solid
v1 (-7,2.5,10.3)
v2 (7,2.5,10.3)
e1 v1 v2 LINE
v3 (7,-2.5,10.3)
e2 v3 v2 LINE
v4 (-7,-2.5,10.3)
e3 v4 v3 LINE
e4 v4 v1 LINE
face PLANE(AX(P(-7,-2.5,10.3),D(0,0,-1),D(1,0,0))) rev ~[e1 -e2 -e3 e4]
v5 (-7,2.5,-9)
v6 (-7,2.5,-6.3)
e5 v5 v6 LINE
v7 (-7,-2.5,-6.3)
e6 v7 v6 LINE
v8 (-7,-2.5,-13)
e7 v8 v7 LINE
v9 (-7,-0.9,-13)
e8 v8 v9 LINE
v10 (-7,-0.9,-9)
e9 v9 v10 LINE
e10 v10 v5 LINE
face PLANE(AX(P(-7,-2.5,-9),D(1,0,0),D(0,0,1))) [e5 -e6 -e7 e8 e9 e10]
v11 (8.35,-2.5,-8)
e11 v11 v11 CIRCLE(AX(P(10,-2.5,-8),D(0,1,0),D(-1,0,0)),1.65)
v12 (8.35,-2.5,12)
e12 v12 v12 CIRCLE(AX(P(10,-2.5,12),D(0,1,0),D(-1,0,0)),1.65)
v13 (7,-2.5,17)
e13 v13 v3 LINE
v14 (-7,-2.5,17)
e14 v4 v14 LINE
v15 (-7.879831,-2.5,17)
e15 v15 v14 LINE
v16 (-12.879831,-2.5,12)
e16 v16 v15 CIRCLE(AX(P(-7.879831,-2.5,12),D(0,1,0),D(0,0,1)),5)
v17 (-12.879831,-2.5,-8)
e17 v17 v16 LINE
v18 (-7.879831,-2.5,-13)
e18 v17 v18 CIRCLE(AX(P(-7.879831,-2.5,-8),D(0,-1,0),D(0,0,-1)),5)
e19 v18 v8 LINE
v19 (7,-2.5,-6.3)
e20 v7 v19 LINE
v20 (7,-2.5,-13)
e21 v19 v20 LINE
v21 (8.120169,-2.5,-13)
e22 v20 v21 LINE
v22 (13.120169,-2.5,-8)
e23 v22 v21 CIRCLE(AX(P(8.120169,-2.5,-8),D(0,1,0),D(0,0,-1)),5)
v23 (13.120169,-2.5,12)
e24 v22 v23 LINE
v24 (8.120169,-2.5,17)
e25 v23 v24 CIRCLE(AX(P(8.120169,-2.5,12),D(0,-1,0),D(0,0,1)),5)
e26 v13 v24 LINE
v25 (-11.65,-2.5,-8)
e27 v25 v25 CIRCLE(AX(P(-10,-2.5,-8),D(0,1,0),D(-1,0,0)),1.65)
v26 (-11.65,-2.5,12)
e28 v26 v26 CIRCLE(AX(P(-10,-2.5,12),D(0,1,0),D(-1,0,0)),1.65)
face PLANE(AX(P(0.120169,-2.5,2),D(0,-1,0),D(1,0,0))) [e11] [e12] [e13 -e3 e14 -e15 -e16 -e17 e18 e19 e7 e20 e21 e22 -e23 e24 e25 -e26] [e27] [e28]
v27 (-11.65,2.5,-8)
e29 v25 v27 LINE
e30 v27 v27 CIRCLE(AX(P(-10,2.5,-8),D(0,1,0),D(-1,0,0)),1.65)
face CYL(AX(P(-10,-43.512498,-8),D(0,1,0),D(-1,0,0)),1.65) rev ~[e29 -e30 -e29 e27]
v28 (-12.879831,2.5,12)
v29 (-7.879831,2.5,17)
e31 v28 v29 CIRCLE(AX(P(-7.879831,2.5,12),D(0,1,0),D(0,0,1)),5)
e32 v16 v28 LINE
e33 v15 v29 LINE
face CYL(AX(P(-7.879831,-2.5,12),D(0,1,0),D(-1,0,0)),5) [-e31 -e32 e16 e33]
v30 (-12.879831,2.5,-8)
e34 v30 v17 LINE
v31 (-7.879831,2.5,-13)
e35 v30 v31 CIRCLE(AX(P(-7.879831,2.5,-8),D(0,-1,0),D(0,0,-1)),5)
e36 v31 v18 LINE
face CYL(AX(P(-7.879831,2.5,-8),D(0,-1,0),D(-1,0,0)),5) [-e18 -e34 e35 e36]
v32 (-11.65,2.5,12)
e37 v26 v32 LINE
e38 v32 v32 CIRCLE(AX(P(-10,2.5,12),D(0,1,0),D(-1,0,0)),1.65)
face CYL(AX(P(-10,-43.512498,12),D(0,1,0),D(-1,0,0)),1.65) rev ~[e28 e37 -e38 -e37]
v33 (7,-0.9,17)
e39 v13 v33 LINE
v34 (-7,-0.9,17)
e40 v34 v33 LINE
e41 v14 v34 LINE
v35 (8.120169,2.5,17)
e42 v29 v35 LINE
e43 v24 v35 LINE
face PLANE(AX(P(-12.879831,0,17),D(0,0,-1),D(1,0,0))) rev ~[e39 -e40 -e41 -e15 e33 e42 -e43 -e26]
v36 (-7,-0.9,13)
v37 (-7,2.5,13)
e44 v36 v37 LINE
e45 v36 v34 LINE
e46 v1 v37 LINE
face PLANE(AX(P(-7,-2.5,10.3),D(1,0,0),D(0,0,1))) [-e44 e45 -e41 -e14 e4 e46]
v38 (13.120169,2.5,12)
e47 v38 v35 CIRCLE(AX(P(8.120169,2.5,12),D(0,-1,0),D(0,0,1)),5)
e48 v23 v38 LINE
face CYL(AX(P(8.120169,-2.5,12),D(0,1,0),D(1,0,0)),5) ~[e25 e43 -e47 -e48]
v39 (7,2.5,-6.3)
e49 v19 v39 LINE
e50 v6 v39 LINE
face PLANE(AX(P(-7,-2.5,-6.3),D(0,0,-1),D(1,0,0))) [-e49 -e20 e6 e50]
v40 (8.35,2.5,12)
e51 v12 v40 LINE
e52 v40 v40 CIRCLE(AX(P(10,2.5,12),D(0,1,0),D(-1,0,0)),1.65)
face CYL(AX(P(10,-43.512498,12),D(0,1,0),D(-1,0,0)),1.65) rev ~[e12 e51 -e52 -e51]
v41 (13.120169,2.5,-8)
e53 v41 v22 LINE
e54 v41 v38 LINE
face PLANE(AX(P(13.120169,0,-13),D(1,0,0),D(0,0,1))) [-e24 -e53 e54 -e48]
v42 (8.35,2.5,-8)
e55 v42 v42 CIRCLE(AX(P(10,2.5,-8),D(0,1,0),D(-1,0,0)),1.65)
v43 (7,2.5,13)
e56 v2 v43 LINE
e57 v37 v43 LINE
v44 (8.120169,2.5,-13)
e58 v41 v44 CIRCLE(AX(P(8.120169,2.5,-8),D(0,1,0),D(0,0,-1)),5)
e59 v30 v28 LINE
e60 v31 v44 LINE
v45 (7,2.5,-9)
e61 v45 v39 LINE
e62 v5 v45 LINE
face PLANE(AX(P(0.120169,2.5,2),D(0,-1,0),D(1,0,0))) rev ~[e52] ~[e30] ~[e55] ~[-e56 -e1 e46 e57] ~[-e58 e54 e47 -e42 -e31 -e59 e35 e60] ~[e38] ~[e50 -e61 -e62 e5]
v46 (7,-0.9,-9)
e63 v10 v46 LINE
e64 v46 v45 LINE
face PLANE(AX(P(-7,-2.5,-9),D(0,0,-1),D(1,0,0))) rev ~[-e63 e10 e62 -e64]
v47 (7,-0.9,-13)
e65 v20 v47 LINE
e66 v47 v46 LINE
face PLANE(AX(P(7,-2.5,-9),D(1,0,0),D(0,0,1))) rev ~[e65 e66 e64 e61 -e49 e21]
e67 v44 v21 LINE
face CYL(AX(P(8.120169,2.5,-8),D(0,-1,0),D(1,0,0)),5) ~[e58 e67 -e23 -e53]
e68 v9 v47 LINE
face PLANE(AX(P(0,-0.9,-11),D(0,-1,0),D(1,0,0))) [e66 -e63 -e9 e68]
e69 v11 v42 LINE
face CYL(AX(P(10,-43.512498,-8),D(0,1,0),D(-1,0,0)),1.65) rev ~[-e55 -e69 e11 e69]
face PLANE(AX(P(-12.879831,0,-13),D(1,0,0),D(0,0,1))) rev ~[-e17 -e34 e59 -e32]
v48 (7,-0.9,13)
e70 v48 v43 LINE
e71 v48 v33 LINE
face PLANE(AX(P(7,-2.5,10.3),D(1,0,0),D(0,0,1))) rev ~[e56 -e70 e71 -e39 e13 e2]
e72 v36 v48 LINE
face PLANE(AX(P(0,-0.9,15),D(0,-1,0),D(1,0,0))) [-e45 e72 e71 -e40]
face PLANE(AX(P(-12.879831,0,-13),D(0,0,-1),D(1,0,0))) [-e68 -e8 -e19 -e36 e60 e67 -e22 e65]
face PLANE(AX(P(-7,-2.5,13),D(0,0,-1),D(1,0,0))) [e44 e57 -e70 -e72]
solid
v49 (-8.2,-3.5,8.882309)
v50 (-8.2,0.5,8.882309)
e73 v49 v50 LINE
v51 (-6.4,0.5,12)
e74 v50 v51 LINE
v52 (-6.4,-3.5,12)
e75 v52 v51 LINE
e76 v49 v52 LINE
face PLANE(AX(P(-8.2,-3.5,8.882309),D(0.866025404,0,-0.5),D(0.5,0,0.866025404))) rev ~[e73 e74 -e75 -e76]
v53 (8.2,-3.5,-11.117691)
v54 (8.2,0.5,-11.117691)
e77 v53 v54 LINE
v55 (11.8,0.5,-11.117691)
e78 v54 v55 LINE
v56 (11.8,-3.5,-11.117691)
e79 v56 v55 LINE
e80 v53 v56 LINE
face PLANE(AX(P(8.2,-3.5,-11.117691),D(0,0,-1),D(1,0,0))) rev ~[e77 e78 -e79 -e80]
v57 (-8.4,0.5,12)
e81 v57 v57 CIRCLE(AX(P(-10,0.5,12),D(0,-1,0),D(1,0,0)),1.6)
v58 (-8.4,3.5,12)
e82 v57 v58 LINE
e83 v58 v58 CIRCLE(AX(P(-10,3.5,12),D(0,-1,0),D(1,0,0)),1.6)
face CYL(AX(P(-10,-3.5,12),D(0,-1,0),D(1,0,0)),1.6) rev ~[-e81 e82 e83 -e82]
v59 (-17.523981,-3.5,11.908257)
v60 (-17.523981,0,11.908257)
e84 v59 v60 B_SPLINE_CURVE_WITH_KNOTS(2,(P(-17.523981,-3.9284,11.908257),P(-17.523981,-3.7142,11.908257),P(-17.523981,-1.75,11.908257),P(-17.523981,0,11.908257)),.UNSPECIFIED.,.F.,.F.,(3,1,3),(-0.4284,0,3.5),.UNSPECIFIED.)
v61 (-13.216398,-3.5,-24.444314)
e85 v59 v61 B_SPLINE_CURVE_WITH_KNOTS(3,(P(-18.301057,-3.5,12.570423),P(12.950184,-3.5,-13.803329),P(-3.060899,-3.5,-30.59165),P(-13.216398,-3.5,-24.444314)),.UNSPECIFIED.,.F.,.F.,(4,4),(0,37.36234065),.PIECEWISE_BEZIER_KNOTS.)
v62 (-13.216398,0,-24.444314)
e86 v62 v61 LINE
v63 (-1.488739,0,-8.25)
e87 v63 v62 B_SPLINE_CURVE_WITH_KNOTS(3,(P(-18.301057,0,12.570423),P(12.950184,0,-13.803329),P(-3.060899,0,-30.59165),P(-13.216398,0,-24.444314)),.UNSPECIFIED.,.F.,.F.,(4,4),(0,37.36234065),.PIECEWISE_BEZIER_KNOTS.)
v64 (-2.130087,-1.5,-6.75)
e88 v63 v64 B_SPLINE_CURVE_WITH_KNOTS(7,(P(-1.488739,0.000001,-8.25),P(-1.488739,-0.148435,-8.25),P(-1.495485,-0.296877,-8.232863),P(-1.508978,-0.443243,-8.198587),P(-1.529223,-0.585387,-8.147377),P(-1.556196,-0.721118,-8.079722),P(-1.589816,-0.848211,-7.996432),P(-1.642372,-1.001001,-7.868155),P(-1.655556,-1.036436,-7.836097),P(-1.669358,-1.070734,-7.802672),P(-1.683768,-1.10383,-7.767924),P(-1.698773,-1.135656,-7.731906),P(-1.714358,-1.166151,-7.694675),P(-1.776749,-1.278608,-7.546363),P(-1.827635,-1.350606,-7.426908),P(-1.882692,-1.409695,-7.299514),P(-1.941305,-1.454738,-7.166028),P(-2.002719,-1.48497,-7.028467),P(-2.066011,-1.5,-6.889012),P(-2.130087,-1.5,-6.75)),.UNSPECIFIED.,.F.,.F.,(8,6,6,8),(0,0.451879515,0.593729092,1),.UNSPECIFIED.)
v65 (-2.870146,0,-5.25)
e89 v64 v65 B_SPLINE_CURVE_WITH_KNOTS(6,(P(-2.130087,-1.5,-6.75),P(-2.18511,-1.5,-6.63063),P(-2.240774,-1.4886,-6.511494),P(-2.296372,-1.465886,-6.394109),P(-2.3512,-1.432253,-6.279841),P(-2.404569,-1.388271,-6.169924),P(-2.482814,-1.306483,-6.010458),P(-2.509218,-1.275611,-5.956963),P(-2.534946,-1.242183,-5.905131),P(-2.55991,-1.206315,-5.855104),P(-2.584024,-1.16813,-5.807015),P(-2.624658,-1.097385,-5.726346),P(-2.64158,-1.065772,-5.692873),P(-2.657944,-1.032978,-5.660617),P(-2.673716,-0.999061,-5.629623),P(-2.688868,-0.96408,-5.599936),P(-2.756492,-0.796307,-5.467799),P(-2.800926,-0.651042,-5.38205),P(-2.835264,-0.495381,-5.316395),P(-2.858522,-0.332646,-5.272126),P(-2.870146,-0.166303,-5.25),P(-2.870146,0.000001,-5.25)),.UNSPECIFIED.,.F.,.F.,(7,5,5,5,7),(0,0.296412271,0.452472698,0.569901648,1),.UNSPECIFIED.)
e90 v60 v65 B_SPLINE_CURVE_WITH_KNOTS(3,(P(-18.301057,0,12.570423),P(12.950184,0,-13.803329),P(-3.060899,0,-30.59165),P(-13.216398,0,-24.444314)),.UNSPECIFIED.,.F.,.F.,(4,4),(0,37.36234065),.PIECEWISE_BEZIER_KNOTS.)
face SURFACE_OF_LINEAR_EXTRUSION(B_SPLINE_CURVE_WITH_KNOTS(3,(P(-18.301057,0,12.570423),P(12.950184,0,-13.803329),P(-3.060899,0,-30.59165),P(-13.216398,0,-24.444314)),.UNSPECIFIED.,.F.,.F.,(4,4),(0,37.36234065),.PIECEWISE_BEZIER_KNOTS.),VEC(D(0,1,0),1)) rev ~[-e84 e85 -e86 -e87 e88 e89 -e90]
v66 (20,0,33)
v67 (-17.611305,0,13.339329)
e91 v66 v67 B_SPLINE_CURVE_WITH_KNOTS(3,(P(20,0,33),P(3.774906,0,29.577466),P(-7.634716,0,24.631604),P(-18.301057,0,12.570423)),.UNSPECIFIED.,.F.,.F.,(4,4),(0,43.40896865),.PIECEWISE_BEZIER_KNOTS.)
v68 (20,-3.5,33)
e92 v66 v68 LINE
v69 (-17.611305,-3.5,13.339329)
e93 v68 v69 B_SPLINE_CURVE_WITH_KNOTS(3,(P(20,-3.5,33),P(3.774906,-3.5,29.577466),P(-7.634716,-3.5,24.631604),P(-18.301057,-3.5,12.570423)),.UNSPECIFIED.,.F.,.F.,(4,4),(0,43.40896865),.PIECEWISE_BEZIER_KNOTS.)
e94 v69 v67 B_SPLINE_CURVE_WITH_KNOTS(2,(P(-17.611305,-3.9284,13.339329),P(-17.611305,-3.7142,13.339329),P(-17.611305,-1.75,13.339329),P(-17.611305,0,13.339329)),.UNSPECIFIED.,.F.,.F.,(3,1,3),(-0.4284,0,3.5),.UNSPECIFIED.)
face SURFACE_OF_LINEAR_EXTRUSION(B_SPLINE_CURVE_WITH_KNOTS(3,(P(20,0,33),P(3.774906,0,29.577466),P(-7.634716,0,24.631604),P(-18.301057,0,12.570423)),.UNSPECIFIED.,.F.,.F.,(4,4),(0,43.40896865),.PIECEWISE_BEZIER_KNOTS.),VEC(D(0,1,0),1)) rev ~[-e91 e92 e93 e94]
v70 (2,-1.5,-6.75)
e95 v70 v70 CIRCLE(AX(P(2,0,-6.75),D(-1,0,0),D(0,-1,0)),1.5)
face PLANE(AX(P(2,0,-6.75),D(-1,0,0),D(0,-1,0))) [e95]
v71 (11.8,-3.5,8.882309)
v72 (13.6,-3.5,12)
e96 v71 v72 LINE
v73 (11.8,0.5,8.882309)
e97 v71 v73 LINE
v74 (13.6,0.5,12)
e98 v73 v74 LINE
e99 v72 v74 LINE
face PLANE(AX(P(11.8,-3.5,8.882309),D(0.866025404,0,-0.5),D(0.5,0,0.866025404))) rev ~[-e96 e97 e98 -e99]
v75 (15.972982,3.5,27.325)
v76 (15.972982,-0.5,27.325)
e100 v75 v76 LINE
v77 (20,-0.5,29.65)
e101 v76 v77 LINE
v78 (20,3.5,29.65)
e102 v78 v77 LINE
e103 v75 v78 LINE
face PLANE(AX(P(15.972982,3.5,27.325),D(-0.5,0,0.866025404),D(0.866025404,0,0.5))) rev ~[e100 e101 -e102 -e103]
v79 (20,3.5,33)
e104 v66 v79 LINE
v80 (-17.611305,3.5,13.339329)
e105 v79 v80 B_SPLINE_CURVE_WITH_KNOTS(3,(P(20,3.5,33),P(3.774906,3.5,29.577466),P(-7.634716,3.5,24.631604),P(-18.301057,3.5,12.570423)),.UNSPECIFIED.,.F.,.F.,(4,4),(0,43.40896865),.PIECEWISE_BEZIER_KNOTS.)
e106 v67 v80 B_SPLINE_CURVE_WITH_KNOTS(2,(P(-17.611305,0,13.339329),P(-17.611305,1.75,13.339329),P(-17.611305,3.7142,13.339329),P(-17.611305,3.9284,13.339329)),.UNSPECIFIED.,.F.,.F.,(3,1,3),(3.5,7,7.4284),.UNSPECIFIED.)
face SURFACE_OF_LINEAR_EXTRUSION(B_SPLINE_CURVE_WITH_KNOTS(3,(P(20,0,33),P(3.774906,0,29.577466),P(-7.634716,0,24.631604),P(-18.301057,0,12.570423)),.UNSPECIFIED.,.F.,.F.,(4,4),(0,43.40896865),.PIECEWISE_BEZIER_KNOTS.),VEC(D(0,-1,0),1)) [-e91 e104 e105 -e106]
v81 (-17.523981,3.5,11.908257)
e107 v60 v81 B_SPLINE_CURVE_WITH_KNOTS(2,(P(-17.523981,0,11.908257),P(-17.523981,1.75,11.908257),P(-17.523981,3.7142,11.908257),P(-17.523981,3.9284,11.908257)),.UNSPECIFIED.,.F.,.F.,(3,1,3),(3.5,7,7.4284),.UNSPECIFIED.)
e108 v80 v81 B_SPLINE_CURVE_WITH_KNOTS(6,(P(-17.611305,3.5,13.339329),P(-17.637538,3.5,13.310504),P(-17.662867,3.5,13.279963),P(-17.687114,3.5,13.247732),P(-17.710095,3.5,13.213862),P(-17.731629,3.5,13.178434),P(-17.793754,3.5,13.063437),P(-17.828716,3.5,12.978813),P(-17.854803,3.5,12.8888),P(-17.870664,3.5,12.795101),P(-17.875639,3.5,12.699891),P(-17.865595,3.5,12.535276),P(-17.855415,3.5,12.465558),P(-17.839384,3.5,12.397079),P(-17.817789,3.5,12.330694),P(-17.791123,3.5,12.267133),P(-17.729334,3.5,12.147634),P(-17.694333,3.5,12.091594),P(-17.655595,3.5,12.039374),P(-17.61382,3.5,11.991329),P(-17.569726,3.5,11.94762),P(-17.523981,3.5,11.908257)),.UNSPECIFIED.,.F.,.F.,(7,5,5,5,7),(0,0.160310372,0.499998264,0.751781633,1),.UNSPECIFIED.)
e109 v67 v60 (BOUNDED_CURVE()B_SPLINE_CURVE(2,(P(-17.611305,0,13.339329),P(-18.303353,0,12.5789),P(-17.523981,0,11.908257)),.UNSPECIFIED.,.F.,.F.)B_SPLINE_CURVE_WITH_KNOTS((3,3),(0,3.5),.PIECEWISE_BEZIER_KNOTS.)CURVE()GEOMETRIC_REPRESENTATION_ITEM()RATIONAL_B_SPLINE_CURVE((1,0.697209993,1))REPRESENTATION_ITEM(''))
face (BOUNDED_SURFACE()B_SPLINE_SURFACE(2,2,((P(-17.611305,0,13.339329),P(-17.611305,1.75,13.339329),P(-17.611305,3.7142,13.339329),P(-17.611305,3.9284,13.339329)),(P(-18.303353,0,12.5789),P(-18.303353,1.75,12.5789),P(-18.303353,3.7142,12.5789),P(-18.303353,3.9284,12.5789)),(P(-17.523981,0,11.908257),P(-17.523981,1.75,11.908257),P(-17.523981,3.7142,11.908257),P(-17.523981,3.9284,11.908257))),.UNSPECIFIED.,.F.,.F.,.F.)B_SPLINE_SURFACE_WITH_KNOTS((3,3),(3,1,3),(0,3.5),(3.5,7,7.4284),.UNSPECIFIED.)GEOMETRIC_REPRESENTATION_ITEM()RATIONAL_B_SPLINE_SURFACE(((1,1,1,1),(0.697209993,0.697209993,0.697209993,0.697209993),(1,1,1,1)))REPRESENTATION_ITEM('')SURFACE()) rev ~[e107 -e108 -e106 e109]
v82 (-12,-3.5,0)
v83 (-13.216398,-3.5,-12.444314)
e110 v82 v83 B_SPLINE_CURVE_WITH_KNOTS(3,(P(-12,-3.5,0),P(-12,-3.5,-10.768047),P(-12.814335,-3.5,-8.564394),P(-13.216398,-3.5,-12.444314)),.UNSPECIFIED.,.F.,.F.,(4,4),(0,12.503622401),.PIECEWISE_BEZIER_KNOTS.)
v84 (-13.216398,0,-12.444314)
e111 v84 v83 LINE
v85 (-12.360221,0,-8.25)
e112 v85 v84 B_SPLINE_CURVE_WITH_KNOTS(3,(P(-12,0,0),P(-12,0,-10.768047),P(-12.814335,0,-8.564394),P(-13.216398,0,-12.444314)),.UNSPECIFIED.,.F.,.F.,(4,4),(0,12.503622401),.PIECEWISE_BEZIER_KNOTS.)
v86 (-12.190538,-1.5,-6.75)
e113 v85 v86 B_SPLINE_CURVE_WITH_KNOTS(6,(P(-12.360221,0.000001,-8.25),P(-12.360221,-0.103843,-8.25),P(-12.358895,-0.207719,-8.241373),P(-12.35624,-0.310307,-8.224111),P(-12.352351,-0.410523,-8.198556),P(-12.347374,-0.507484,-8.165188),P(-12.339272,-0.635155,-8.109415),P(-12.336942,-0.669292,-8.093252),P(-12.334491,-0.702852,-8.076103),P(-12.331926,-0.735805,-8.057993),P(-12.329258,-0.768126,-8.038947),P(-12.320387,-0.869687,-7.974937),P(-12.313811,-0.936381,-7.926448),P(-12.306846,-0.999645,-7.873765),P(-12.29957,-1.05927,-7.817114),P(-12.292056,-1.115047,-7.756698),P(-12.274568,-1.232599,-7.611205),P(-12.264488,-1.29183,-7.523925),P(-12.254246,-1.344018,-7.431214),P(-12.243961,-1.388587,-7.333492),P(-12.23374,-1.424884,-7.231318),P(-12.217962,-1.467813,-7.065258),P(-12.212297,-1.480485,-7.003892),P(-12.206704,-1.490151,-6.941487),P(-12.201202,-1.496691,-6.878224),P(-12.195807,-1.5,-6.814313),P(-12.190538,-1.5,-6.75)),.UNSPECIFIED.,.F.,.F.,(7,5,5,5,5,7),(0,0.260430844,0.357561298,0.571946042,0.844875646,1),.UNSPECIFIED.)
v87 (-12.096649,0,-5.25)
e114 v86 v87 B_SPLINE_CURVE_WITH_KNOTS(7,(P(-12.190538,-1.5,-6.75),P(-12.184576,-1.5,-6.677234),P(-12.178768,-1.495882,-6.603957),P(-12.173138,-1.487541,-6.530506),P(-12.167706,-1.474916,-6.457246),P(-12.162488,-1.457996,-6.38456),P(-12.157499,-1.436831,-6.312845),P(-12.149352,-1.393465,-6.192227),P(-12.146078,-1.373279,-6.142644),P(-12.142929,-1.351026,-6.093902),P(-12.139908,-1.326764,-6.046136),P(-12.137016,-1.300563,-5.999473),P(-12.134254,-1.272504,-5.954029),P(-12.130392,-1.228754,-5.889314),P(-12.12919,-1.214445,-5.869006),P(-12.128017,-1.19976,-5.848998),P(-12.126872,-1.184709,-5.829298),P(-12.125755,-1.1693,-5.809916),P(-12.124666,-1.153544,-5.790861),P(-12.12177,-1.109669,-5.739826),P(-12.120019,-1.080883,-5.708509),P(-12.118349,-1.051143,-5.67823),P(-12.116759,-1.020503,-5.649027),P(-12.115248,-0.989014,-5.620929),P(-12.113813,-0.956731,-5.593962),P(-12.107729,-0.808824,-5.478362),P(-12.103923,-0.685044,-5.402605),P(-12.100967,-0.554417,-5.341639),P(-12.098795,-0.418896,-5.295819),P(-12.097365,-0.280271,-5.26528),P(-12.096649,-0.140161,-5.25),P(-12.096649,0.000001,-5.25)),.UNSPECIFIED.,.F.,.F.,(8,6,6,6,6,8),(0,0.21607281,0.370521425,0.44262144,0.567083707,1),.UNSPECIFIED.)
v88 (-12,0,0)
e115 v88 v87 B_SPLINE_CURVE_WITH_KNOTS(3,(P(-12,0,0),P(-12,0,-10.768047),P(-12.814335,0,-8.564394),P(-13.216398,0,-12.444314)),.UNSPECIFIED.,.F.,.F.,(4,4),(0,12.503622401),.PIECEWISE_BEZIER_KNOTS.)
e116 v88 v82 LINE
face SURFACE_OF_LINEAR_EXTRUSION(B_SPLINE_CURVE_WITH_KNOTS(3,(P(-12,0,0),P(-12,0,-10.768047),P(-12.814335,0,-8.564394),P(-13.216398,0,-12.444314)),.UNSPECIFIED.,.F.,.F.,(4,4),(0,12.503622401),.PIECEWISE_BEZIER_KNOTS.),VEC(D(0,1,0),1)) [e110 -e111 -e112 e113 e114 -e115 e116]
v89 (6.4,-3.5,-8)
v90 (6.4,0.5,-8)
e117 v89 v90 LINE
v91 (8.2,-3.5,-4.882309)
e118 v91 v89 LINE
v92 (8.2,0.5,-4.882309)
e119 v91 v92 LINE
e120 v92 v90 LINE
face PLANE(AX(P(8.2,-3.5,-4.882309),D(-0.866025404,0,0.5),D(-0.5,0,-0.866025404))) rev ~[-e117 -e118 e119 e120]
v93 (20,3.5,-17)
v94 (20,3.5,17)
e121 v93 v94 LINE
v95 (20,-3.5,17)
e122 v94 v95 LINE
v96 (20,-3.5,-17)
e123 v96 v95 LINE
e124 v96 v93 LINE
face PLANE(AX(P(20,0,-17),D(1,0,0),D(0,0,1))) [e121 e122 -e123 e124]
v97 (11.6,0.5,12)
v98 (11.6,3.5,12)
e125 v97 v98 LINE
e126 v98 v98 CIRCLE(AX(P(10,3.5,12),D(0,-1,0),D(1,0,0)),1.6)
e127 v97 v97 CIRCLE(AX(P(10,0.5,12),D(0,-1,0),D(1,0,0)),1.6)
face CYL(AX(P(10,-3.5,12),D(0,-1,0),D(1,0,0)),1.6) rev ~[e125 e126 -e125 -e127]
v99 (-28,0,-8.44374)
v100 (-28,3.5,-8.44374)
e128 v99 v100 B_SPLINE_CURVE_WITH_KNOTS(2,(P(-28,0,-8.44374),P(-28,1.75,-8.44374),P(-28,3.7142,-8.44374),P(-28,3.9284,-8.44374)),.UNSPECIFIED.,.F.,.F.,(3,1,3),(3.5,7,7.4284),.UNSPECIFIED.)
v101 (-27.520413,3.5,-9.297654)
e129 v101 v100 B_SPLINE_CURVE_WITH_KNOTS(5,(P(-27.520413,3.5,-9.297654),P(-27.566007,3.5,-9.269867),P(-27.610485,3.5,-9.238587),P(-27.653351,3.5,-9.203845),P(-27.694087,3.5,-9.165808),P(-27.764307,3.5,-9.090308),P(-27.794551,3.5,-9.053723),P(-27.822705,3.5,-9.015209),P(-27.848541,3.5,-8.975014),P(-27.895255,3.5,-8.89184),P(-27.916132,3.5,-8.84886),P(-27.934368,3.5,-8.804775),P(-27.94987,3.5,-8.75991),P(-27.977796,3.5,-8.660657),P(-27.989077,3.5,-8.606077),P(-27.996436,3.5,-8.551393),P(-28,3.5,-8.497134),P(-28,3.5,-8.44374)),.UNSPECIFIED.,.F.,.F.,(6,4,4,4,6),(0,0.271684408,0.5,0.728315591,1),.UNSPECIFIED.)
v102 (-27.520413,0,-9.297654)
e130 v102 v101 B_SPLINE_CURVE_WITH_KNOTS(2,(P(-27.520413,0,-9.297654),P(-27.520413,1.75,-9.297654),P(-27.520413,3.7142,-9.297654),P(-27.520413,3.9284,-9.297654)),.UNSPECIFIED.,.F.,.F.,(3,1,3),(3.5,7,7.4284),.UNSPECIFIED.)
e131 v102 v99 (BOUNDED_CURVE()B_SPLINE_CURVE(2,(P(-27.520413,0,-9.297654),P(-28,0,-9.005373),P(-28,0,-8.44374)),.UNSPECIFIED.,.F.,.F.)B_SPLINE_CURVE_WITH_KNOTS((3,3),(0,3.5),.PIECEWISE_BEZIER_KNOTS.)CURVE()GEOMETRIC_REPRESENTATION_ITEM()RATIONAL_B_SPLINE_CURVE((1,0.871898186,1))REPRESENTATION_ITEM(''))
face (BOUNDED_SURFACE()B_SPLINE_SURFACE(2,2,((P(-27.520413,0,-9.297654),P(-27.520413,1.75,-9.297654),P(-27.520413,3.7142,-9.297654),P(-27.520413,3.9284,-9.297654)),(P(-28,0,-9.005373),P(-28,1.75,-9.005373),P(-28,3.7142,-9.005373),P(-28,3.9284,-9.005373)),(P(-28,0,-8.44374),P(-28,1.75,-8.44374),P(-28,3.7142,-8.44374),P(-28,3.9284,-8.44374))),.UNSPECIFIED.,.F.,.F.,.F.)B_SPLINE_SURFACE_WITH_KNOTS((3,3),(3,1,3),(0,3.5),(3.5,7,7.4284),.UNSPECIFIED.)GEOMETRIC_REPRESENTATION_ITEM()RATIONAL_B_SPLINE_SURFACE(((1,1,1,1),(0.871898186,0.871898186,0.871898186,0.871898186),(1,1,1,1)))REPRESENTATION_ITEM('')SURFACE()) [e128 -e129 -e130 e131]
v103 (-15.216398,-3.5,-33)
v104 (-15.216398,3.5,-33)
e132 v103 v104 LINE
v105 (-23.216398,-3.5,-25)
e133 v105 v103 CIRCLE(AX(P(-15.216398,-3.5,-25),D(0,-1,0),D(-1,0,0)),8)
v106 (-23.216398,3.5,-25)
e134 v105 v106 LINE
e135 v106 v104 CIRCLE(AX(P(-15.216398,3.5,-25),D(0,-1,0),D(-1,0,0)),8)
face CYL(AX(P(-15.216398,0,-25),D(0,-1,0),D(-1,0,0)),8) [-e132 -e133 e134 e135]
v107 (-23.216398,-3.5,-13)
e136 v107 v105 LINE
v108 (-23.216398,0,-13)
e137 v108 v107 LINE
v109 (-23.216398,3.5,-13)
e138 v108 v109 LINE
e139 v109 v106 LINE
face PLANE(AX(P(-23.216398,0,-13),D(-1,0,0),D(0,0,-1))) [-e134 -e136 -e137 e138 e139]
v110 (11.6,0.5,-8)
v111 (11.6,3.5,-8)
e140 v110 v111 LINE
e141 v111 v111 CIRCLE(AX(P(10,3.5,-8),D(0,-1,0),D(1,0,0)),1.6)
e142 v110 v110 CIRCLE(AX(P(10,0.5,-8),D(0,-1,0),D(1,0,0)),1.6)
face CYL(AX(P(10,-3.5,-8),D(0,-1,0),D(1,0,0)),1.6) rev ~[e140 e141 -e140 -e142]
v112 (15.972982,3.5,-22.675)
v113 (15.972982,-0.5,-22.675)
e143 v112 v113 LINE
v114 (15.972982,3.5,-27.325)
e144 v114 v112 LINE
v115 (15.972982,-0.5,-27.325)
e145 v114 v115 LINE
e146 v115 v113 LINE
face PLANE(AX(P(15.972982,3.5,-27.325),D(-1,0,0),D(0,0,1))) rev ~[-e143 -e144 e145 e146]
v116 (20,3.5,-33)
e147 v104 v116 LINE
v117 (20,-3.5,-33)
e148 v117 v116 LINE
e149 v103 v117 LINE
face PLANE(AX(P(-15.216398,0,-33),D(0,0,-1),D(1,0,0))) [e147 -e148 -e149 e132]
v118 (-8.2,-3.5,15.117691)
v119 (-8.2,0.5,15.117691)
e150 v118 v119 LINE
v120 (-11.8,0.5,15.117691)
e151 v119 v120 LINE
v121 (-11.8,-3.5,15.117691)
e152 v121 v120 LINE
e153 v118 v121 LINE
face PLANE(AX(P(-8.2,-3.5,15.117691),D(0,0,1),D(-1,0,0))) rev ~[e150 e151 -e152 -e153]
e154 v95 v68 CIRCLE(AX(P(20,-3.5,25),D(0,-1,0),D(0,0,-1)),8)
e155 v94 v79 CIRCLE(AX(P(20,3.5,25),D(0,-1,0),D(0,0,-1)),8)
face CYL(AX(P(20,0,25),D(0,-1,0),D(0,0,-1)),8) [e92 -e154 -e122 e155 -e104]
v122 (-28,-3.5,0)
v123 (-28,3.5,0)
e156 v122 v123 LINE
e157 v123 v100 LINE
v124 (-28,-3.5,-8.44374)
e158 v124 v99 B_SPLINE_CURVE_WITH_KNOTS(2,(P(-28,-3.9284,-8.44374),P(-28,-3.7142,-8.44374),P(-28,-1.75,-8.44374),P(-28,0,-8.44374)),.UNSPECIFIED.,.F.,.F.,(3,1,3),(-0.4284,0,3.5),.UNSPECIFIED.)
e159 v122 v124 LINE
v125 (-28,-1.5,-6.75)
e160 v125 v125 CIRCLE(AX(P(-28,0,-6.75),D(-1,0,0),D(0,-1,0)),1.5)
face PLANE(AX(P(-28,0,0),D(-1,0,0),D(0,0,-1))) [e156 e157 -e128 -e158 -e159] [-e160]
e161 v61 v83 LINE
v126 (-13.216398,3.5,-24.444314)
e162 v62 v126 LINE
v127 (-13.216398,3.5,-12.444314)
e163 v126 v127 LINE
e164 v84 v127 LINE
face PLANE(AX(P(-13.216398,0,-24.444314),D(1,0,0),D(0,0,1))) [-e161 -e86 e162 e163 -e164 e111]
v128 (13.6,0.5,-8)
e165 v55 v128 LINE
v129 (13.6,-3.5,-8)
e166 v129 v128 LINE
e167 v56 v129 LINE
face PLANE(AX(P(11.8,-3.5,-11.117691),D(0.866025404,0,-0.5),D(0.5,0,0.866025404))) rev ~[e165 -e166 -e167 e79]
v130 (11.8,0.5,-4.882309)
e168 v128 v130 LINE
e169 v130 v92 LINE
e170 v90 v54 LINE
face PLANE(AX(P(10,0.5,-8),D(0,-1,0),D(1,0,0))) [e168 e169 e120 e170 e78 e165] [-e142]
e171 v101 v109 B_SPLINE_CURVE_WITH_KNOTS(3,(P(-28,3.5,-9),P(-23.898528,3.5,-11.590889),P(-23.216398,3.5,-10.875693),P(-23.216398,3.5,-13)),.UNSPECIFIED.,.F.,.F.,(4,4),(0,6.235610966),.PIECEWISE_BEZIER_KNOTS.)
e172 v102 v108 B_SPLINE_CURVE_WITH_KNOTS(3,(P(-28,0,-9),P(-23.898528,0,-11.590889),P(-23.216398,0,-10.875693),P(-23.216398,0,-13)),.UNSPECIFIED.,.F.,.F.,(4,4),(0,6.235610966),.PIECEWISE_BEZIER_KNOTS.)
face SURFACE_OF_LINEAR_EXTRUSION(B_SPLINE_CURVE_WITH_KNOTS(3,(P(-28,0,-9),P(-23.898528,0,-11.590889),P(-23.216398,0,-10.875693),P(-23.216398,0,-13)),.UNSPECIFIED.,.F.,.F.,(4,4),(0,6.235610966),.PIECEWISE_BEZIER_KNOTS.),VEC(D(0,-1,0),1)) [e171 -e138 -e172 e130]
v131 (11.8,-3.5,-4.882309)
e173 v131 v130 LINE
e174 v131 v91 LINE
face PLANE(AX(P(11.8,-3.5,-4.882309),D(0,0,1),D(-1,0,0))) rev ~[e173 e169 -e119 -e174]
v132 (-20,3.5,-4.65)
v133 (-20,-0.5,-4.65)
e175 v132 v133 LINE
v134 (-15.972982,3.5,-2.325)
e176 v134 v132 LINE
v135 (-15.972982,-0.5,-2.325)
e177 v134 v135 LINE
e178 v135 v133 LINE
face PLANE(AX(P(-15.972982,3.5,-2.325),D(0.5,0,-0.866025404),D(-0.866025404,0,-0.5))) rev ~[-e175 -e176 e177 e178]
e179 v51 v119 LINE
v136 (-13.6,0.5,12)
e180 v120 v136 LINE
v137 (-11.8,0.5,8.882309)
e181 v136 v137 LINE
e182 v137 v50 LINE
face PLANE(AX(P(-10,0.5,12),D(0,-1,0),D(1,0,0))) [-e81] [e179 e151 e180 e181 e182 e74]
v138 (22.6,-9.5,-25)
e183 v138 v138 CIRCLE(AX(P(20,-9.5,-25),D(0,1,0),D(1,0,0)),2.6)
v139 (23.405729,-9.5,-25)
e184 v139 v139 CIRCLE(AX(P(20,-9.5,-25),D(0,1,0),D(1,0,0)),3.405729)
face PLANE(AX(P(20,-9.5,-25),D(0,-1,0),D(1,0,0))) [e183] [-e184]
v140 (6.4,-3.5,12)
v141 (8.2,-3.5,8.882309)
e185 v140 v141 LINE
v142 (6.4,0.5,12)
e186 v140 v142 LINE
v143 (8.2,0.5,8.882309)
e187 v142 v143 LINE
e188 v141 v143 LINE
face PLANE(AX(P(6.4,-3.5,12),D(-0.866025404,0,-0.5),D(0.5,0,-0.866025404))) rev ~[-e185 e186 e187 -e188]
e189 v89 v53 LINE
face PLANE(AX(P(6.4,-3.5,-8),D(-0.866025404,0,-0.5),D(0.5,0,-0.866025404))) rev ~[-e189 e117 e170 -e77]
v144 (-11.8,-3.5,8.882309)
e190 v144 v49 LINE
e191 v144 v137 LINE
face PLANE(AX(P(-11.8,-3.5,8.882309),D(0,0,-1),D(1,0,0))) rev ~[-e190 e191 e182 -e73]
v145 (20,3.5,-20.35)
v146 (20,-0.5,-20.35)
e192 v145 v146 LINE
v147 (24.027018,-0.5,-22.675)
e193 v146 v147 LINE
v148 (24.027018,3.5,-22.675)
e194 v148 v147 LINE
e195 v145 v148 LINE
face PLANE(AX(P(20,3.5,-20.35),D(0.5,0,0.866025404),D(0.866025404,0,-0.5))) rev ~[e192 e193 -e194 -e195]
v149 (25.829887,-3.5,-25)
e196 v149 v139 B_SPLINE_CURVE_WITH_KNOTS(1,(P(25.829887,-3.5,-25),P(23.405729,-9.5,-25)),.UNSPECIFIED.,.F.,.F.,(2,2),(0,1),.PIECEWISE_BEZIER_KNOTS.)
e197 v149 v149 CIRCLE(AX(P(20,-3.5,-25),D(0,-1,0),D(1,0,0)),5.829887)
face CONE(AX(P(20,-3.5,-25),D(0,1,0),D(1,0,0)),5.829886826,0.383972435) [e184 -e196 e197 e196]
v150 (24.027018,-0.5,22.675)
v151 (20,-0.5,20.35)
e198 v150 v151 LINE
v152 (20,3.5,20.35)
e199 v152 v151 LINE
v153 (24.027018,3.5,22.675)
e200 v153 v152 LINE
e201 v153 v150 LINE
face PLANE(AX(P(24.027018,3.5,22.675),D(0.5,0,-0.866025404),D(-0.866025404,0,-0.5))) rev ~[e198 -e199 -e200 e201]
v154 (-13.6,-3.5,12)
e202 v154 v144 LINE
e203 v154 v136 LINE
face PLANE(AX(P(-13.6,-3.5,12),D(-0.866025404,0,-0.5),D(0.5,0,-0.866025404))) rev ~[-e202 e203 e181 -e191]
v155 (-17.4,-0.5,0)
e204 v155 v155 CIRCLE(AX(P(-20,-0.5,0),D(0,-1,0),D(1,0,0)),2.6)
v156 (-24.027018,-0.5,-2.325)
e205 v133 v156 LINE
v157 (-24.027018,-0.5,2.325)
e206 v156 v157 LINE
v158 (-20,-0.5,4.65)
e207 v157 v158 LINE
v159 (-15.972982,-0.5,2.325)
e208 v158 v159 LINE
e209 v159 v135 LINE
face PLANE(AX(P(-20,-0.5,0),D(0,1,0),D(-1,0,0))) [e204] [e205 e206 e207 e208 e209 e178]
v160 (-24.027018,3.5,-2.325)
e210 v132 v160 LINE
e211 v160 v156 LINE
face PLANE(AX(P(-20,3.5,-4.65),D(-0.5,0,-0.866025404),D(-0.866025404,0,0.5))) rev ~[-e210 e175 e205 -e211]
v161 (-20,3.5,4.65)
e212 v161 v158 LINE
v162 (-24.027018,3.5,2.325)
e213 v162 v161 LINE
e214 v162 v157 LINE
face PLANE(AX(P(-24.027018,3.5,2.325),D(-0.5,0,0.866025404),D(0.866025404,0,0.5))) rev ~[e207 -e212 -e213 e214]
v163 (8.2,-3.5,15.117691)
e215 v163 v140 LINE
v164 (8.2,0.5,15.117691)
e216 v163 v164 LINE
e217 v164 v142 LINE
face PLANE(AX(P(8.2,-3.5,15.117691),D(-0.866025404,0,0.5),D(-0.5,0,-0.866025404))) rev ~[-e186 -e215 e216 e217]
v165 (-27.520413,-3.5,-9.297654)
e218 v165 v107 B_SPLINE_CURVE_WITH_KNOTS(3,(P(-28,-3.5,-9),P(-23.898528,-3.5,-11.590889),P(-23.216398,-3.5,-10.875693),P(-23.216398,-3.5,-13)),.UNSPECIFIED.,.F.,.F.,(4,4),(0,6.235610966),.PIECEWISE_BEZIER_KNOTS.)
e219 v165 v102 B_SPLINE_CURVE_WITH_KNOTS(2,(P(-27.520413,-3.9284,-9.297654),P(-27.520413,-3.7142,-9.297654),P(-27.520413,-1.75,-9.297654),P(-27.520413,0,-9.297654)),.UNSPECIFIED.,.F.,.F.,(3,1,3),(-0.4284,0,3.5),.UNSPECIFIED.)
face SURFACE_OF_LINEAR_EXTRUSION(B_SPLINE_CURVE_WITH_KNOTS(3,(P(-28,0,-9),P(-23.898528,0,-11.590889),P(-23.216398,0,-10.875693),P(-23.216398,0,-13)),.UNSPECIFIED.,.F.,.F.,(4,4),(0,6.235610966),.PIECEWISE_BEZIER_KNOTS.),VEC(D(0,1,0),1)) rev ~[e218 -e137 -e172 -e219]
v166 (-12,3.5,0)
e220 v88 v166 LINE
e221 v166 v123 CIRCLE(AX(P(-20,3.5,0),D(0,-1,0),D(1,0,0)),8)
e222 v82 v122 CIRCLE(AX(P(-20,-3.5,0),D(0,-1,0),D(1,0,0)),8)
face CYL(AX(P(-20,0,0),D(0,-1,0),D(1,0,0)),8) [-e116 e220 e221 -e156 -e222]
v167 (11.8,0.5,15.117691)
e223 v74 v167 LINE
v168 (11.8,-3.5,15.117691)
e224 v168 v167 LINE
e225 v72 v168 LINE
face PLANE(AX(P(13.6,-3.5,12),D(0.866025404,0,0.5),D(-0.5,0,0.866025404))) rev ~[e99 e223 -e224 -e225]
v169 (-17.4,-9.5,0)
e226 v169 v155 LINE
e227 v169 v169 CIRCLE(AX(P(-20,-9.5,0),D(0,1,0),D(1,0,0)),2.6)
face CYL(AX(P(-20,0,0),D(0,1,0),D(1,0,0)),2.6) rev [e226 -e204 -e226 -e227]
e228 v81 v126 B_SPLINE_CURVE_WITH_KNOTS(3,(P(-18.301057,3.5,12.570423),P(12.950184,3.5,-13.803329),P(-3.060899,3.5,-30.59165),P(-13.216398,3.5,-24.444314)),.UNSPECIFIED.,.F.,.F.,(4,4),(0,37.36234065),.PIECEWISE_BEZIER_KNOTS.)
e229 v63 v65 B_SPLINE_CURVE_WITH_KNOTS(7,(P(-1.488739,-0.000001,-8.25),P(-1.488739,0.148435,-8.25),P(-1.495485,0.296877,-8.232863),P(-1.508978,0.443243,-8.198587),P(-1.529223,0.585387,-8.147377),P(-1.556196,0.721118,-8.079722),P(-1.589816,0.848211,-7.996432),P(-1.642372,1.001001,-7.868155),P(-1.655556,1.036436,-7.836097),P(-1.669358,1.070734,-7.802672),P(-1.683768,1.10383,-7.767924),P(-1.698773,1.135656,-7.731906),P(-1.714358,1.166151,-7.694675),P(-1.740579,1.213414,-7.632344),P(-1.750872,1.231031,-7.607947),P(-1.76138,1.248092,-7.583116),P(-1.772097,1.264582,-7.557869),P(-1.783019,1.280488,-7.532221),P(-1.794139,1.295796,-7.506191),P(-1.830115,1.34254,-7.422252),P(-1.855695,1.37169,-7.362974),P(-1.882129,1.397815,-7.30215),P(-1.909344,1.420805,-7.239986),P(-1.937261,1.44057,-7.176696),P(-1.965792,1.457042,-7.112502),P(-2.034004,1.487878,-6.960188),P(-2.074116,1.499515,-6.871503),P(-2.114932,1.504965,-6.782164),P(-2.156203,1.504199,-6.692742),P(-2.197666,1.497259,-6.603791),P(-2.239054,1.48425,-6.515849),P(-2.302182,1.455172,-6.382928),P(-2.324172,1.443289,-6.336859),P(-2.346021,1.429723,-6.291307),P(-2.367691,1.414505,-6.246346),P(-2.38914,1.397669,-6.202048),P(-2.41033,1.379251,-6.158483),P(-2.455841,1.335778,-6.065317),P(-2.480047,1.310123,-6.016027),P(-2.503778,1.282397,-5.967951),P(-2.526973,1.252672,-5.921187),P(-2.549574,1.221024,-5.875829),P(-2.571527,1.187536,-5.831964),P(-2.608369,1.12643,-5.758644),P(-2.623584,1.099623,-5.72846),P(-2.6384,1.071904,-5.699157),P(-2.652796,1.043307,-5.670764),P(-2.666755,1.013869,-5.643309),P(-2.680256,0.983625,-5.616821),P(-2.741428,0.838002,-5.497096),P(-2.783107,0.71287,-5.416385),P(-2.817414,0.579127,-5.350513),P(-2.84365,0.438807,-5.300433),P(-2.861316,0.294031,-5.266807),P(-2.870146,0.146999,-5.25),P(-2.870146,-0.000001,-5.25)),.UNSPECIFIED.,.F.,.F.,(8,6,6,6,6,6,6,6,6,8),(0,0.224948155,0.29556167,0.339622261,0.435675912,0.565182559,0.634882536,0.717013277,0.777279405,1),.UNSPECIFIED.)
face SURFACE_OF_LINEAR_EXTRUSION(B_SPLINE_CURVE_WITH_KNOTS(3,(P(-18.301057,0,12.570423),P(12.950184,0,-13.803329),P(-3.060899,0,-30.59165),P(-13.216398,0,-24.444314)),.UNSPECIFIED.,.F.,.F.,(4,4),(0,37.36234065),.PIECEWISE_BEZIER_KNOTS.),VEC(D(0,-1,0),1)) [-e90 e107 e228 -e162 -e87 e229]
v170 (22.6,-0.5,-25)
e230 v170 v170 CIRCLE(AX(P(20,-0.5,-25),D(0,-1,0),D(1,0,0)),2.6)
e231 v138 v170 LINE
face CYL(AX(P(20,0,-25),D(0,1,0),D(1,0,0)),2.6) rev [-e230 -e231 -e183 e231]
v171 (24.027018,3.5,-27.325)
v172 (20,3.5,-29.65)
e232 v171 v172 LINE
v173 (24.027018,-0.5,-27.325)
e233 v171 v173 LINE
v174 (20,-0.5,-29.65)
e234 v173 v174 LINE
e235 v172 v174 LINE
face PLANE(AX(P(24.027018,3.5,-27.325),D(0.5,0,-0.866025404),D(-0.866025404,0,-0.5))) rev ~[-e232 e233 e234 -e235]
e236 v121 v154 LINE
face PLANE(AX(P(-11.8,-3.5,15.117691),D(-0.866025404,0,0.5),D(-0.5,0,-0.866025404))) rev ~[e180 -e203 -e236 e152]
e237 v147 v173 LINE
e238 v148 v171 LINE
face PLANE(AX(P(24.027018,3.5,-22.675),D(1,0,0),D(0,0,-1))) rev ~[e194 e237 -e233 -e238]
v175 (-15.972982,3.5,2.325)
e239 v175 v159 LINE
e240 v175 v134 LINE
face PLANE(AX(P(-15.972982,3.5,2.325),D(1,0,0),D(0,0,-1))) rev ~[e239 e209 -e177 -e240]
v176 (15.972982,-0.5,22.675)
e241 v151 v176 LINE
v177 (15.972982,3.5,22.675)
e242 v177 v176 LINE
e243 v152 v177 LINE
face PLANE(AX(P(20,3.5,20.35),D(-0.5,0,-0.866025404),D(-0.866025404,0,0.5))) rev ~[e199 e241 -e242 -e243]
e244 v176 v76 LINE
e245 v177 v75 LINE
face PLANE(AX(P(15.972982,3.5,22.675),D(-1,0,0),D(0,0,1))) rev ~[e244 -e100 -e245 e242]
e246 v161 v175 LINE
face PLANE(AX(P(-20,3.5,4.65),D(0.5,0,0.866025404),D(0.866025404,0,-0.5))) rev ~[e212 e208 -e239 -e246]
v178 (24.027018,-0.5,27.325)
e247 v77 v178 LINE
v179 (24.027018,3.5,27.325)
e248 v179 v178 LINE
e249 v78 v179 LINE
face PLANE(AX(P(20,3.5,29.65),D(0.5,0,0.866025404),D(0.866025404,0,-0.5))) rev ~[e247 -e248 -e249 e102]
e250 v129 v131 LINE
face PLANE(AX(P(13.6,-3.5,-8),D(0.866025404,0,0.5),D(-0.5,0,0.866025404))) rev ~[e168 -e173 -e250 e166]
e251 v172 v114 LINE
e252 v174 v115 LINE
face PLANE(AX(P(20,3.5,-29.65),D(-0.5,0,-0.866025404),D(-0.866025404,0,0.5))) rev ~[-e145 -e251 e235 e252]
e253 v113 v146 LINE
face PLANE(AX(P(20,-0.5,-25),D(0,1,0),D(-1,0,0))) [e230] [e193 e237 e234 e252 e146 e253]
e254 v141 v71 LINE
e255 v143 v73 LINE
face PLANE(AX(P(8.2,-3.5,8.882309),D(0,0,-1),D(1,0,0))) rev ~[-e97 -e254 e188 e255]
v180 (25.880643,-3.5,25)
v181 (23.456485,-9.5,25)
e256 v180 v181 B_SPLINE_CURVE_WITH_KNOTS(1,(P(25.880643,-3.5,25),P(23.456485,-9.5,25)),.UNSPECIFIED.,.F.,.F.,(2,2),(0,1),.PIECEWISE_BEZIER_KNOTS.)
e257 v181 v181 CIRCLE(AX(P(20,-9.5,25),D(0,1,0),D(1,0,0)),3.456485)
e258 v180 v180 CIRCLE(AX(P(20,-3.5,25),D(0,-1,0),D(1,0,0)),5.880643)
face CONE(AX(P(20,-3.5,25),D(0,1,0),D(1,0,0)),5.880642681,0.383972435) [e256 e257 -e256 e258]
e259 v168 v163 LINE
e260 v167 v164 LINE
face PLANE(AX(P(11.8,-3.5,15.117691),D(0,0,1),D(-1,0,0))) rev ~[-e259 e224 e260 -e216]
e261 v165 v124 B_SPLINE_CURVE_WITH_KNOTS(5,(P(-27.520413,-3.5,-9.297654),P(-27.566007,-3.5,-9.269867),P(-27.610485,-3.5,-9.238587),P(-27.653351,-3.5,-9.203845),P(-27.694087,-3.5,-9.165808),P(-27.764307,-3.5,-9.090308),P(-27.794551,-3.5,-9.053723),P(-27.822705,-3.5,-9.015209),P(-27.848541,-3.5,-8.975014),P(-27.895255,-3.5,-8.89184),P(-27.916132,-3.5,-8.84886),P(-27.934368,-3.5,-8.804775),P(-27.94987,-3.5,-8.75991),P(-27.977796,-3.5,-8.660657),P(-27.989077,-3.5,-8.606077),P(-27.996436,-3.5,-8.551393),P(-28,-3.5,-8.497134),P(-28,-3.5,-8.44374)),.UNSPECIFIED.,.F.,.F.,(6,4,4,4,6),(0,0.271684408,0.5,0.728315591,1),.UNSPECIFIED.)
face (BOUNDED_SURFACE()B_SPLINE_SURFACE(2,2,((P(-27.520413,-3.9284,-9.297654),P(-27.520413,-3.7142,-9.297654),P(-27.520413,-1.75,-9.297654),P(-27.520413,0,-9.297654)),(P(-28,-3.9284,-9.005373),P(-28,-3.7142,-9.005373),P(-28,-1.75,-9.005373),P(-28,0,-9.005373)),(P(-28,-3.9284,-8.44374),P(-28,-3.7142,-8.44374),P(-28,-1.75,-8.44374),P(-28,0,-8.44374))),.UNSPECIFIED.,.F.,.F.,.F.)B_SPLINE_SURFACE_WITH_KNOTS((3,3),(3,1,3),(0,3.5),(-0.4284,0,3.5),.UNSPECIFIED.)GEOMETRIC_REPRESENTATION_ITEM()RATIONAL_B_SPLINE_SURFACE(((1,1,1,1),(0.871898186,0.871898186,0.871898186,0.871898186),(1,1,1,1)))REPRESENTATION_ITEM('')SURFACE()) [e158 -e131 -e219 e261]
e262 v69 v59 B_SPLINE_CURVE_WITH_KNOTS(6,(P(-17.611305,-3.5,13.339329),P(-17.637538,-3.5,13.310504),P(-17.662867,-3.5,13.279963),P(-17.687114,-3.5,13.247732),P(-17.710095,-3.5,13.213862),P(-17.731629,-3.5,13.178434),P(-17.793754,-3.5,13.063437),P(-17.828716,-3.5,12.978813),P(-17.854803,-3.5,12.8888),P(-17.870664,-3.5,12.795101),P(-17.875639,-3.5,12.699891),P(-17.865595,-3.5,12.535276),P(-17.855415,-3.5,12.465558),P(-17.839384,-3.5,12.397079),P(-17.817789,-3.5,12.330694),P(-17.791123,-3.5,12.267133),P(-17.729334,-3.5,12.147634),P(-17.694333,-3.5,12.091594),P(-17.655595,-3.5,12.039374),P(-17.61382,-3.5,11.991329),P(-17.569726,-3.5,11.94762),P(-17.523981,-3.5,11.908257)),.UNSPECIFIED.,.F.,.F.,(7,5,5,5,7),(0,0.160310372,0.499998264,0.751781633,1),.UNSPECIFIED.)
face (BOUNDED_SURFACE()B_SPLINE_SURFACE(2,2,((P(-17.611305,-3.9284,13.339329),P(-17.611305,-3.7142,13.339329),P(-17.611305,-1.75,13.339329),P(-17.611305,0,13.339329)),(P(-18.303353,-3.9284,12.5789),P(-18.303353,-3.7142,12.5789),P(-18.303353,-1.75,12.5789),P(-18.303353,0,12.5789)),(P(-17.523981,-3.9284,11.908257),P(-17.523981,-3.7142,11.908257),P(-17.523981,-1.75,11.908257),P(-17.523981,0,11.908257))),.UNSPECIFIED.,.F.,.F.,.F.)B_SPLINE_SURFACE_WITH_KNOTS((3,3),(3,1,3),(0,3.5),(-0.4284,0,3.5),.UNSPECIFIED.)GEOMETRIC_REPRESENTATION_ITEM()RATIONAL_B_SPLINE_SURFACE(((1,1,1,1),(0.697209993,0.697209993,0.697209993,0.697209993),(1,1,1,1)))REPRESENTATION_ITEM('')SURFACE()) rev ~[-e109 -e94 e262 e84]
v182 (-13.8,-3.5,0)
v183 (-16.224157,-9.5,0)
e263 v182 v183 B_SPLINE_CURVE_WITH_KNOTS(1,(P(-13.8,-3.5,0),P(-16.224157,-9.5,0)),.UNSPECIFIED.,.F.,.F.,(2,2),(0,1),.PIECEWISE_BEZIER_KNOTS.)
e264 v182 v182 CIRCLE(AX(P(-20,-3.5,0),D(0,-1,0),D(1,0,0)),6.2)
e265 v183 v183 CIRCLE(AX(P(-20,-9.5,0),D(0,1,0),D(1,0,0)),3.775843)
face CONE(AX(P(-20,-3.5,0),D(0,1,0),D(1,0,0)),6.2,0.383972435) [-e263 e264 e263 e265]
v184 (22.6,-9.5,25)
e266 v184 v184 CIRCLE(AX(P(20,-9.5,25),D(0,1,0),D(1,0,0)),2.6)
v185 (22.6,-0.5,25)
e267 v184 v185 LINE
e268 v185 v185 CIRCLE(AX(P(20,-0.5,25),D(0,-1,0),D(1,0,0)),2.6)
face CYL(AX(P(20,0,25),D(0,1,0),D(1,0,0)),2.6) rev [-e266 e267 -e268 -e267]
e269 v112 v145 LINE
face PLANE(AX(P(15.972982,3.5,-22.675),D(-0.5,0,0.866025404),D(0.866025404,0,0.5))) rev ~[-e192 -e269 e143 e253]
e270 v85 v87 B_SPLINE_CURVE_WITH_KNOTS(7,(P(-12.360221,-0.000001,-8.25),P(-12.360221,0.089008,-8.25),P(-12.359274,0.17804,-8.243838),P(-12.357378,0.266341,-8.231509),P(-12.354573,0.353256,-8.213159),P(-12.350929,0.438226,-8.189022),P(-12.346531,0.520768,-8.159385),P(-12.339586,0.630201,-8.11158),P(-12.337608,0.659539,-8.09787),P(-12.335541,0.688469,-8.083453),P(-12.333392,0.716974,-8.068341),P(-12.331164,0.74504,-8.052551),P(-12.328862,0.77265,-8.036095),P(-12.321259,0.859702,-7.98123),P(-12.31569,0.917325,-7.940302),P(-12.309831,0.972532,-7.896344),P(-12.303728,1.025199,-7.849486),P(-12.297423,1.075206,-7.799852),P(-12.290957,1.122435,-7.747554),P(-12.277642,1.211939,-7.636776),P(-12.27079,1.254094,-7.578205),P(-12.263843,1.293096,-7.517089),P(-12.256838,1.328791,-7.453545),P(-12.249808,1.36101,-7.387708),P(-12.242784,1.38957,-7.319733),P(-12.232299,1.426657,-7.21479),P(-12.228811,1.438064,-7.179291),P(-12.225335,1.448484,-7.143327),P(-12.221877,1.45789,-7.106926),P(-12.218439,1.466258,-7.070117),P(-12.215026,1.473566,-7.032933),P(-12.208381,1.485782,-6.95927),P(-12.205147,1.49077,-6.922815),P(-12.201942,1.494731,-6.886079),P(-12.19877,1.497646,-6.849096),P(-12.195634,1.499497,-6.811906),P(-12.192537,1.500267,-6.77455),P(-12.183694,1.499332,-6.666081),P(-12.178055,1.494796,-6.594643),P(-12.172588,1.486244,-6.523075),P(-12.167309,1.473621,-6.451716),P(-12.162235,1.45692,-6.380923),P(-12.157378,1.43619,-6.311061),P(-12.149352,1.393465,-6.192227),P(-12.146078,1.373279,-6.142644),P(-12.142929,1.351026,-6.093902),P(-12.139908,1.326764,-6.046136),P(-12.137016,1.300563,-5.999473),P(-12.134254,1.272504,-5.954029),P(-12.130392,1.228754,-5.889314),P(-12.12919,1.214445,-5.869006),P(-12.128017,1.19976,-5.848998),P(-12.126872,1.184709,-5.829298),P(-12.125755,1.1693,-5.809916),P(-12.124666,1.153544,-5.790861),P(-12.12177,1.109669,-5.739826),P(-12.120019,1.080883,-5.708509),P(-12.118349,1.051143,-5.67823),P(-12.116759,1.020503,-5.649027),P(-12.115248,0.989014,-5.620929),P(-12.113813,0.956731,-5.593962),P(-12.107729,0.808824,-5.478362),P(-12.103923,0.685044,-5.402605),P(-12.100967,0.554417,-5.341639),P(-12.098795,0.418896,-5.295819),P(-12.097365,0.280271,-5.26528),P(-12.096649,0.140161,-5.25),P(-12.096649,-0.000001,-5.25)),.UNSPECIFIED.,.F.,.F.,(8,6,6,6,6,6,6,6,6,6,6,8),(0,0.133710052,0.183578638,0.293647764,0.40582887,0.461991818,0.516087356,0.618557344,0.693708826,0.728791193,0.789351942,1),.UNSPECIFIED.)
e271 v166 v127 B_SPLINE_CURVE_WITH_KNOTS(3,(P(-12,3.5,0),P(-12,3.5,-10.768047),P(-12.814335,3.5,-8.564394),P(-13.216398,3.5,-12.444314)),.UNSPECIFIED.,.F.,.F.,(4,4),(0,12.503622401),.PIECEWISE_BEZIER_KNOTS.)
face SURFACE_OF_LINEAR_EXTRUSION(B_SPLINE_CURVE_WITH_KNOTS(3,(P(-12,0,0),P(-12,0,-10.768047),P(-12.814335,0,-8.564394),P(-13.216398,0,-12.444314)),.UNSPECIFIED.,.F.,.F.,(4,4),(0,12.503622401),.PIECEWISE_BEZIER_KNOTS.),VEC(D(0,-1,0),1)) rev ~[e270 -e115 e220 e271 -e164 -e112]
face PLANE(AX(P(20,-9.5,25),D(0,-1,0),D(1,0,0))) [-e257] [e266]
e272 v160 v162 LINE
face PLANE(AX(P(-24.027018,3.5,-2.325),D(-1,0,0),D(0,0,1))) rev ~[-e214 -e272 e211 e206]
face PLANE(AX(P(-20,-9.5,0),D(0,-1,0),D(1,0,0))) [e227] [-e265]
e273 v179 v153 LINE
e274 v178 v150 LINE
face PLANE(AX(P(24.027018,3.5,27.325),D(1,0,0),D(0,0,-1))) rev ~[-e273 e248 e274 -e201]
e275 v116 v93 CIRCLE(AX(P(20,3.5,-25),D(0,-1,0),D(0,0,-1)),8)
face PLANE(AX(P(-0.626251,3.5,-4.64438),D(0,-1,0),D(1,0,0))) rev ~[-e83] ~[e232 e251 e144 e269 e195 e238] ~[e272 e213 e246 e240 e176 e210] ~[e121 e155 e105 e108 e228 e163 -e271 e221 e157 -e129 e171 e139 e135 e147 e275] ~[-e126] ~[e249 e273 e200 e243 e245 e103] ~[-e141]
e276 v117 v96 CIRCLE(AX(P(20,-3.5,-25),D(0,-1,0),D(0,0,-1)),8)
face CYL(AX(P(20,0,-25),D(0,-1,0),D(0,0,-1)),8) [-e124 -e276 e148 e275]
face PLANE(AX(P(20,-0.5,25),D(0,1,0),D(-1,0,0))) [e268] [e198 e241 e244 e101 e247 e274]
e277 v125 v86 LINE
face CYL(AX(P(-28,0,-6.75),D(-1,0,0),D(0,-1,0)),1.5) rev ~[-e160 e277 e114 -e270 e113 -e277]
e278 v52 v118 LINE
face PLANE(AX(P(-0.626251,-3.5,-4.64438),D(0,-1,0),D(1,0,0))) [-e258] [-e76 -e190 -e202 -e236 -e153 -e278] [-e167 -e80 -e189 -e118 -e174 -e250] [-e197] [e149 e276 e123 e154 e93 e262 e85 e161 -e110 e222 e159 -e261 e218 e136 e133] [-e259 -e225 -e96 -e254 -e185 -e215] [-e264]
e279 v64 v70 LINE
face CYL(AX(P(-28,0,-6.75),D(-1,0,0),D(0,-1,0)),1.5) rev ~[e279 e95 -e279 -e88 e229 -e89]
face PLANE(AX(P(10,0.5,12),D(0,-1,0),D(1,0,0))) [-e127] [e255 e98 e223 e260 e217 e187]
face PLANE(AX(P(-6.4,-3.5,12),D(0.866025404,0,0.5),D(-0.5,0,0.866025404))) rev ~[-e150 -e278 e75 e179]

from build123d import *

# Parameters (mm, degrees)
F0_R      = 2.6
F2_DEPTH  = 3.5
F3_R      = 1.5
F4_DEPTH  = 30
F5_R      = 1
F6_R      = 2.6
F7_DEPTH  = 4
F8_R      = 1.6
F9_DEPTH  = 7.0010001
F11_DEPTH = 4
F13_R     = 6.2
F13_R_2   = 5.8806426812
F13_R_3   = 5.8298868264
F14_DEPTH = 6
F14_TAPER = 22
F15_DEPTH = 9.5010001
F1_W      = 26
F1_H      = 30
F16_DEPTH = 2.5
F17_R     = 5
F18_D     = 3.3
F19_W     = 14
F19_H     = 4
F20_DEPTH = 1.6
F19_H_2   = 2.7
F21_DEPTH = 6.0010001


# Not quite as in the source:
# - a feature names something its author has since deleted; it is built from what else it names


with BuildPart() as f2:
    # F0 (on Front) → F2 (new body, symmetric)
    with BuildSketch(Plane.XZ):
        with BuildLine():
            Line((20, -17), (20, 17))
            ThreePointArc((20, 17), (28, 25), (20, 33))
            add(Edge.make_bspline(
                [(20, 33), (3.7749062758, 29.5774657279), (-7.6347162536, 24.6316035201), (-18.301056698, 12.5704230329)],
                knots=[0, 0, 0, 0, 43.4089686498, 43.4089686498, 43.4089686498, 43.4089686498], degree=3))
            add(Edge.make_bspline(
                [(-18.301056698, 12.5704230329), (12.9501838237, -13.8033293188), (-3.0608992092, -30.5916499346), (-13.2163984158, -24.4443138838)],
                knots=[0, 0, 0, 0, 37.3623406501, 37.3623406501, 37.3623406501, 37.3623406501], degree=3))
            Line((-13.2163984158, -24.4443138838), (-13.2163984158, -12.4443138838))
            add(Edge.make_bspline(
                [(-12, 0), (-12, -10.7680466438), (-12.8143349567, -8.5643939674), (-13.2163984158, -12.4443138838)],
                knots=[0, 0, 0, 0, 12.5036224009, 12.5036224009, 12.5036224009, 12.5036224009], degree=3))
            ThreePointArc((-12, 0), (-20, 8), (-28, 0))
            Line((-28, 0), (-28, -9))
            add(Edge.make_bspline(
                [(-28, -9), (-23.8985275179, -11.5908890814), (-23.2163984158, -10.8756929968), (-23.2163984158, -13)],
                knots=[0, 0, 0, 0, 6.2356109658, 6.2356109658, 6.2356109658, 6.2356109658], degree=3))
            Line((-23.2163984158, -13), (-23.2163984158, -25))
            ThreePointArc((-23.2163984158, -25), (-20.8732526653, -30.6568542495), (-15.2163984158, -33))
            Line((-15.2163984158, -33), (20, -33))
            ThreePointArc((20, -33), (28, -25), (20, -17))
        make_face()
        with Locations((20, -25)):
            Circle(F0_R, mode=Mode.SUBTRACT)
        with Locations((-20, 0)):
            Circle(F0_R, mode=Mode.SUBTRACT)
        with Locations((20, 25)):
            Circle(F0_R, mode=Mode.SUBTRACT)
    extrude(amount=F2_DEPTH, both=True)

    # F3 (on face) → F4 (cut)
    with BuildSketch(Plane(origin=(-28, 0, 0), x_dir=(0, -1, 0), z_dir=(-1, 0, 0))):
        with Locations((0, -6.75)):
            Circle(F3_R)
    extrude(amount=-F4_DEPTH, mode=Mode.SUBTRACT)

    # F5
    f5_edges = [f2.edges().sort_by_distance(p)[0] for p in [
        (-28, 1.75, -9),
        (-28, -1.75, -9),
        (-18.301057, 1.75, 12.570423),
        (-18.301057, -1.75, 12.570423),
    ]]
    fillet(f5_edges, radius=F5_R)

    # F6 (on face) → F7 (cut)
    with BuildSketch(Plane(origin=(0, 3.5, 0), x_dir=(-1, 0, 0), z_dir=(0, 1, 0))):
        Polygon((-24.0270181276, -27.325), (-20, -29.65), (-15.9729818724, -27.325), (-15.9729818724, -22.675), (-20, -20.35), (-24.0270181276, -22.675), align=None)
        with Locations((-20, -25)):
            Circle(F6_R, mode=Mode.SUBTRACT)
        Polygon((15.9729818724, -2.325), (20, -4.65), (24.0270181276, -2.325), (24.0270181276, 2.325), (20, 4.65), (15.9729818724, 2.325), align=None)
        with Locations((20, 0)):
            Circle(F6_R, mode=Mode.SUBTRACT)
        Polygon((-24.0270181276, 22.675), (-20, 20.35), (-15.9729818724, 22.675), (-15.9729818724, 27.325), (-20, 29.65), (-24.0270181276, 27.325), align=None)
        with Locations((-20, 25)):
            Circle(F6_R, mode=Mode.SUBTRACT)
    extrude(amount=-F7_DEPTH, mode=Mode.SUBTRACT)

    # F8 (on face) → F9 (cut, through all)
    with BuildSketch(Plane.XZ.offset(3.5)):
        with Locations((10, 12)):
            Circle(F8_R)
        with Locations((-10, 12)):
            Circle(F8_R)
        with Locations((10, -8)):
            Circle(F8_R)
        with Locations((-10, -8)):
            Circle(F8_R)
    extrude(amount=-F9_DEPTH, mode=Mode.SUBTRACT)

    # F10 (on face) → F11 (cut)
    with BuildSketch(Plane.XZ.offset(3.5)):
        Polygon((-8.2, 8.8823085464), (-6.4, 12), (-8.2, 15.1176914536), (-11.8, 15.1176914536), (-13.6, 12), (-11.8, 8.8823085464), align=None)
        Polygon((13.6, 12), (11.8, 15.1176914536), (8.2, 15.1176914536), (6.4, 12), (8.2, 8.8823085464), (11.8, 8.8823085464), align=None)
        Polygon((13.6, -8), (11.8, -4.8823085464), (8.2, -4.8823085464), (6.4, -8), (8.2, -11.1176914536), (11.8, -11.1176914536), align=None)
    extrude(amount=-F11_DEPTH, mode=Mode.SUBTRACT)

    # F13 (on offset) → F14 (join)
    with BuildSketch(Plane.XZ.offset(3.5)):
        with Locations((-20, 0)):
            Circle(F13_R)
        with Locations((20, 25)):
            Circle(F13_R_2)
        with Locations((20, -25)):
            Circle(F13_R_3)
    extrude(amount=F14_DEPTH, taper=F14_TAPER)

    # F0 (on Front) → F15 (cut, through all)
    with BuildSketch(Plane.XZ):
        with Locations((20, -25)):
            Circle(F0_R)
        with Locations((20, 25)):
            Circle(F0_R)
        with Locations((-20, 0)):
            Circle(F0_R)
    extrude(amount=F15_DEPTH, mode=Mode.SUBTRACT)


with BuildPart() as f16:
    # F1 (on Front) → F16 (new body, symmetric)
    with BuildSketch(Plane.XZ):
        with Locations((0.1201688498, 2)):
            Rectangle(F1_W, F1_H)
    extrude(amount=F16_DEPTH, both=True)

    # F17
    f17_edges = [f16.edges().sort_by_distance(p)[0] for p in [
        (-12.879831, 0, 17),
        (-12.879831, 0, -13),
        (13.120169, 0, 17),
        (13.120169, 0, -13),
    ]]
    fillet(f17_edges, radius=F17_R)

    # F18 (through all)
    with Locations(Plane.XZ.offset(3.5)):
        with Locations((10, 12), (-10, 12), (-10, -8), (10, -8)):
            Hole(F18_D / 2)

    # F19 (on face) → F20 (cut)
    with BuildSketch(Plane.XZ.offset(2.5)):
        with Locations((0, 15)):
            Rectangle(F19_W, F19_H)
        with Locations((0, -11)):
            Rectangle(F19_W, F19_H)
    extrude(amount=-F20_DEPTH, mode=Mode.SUBTRACT)

    # F19 (on face) → F21 (cut, through all)
    with BuildSketch(Plane.XZ.offset(2.5)):
        with Locations((0, -7.65)):
            Rectangle(F19_W, F19_H_2)
        with Locations((0, 11.65)):
            Rectangle(F19_W, F19_H_2)
    extrude(amount=-F21_DEPTH, mode=Mode.SUBTRACT)


solid = Compound([f2.part, f16.part])
